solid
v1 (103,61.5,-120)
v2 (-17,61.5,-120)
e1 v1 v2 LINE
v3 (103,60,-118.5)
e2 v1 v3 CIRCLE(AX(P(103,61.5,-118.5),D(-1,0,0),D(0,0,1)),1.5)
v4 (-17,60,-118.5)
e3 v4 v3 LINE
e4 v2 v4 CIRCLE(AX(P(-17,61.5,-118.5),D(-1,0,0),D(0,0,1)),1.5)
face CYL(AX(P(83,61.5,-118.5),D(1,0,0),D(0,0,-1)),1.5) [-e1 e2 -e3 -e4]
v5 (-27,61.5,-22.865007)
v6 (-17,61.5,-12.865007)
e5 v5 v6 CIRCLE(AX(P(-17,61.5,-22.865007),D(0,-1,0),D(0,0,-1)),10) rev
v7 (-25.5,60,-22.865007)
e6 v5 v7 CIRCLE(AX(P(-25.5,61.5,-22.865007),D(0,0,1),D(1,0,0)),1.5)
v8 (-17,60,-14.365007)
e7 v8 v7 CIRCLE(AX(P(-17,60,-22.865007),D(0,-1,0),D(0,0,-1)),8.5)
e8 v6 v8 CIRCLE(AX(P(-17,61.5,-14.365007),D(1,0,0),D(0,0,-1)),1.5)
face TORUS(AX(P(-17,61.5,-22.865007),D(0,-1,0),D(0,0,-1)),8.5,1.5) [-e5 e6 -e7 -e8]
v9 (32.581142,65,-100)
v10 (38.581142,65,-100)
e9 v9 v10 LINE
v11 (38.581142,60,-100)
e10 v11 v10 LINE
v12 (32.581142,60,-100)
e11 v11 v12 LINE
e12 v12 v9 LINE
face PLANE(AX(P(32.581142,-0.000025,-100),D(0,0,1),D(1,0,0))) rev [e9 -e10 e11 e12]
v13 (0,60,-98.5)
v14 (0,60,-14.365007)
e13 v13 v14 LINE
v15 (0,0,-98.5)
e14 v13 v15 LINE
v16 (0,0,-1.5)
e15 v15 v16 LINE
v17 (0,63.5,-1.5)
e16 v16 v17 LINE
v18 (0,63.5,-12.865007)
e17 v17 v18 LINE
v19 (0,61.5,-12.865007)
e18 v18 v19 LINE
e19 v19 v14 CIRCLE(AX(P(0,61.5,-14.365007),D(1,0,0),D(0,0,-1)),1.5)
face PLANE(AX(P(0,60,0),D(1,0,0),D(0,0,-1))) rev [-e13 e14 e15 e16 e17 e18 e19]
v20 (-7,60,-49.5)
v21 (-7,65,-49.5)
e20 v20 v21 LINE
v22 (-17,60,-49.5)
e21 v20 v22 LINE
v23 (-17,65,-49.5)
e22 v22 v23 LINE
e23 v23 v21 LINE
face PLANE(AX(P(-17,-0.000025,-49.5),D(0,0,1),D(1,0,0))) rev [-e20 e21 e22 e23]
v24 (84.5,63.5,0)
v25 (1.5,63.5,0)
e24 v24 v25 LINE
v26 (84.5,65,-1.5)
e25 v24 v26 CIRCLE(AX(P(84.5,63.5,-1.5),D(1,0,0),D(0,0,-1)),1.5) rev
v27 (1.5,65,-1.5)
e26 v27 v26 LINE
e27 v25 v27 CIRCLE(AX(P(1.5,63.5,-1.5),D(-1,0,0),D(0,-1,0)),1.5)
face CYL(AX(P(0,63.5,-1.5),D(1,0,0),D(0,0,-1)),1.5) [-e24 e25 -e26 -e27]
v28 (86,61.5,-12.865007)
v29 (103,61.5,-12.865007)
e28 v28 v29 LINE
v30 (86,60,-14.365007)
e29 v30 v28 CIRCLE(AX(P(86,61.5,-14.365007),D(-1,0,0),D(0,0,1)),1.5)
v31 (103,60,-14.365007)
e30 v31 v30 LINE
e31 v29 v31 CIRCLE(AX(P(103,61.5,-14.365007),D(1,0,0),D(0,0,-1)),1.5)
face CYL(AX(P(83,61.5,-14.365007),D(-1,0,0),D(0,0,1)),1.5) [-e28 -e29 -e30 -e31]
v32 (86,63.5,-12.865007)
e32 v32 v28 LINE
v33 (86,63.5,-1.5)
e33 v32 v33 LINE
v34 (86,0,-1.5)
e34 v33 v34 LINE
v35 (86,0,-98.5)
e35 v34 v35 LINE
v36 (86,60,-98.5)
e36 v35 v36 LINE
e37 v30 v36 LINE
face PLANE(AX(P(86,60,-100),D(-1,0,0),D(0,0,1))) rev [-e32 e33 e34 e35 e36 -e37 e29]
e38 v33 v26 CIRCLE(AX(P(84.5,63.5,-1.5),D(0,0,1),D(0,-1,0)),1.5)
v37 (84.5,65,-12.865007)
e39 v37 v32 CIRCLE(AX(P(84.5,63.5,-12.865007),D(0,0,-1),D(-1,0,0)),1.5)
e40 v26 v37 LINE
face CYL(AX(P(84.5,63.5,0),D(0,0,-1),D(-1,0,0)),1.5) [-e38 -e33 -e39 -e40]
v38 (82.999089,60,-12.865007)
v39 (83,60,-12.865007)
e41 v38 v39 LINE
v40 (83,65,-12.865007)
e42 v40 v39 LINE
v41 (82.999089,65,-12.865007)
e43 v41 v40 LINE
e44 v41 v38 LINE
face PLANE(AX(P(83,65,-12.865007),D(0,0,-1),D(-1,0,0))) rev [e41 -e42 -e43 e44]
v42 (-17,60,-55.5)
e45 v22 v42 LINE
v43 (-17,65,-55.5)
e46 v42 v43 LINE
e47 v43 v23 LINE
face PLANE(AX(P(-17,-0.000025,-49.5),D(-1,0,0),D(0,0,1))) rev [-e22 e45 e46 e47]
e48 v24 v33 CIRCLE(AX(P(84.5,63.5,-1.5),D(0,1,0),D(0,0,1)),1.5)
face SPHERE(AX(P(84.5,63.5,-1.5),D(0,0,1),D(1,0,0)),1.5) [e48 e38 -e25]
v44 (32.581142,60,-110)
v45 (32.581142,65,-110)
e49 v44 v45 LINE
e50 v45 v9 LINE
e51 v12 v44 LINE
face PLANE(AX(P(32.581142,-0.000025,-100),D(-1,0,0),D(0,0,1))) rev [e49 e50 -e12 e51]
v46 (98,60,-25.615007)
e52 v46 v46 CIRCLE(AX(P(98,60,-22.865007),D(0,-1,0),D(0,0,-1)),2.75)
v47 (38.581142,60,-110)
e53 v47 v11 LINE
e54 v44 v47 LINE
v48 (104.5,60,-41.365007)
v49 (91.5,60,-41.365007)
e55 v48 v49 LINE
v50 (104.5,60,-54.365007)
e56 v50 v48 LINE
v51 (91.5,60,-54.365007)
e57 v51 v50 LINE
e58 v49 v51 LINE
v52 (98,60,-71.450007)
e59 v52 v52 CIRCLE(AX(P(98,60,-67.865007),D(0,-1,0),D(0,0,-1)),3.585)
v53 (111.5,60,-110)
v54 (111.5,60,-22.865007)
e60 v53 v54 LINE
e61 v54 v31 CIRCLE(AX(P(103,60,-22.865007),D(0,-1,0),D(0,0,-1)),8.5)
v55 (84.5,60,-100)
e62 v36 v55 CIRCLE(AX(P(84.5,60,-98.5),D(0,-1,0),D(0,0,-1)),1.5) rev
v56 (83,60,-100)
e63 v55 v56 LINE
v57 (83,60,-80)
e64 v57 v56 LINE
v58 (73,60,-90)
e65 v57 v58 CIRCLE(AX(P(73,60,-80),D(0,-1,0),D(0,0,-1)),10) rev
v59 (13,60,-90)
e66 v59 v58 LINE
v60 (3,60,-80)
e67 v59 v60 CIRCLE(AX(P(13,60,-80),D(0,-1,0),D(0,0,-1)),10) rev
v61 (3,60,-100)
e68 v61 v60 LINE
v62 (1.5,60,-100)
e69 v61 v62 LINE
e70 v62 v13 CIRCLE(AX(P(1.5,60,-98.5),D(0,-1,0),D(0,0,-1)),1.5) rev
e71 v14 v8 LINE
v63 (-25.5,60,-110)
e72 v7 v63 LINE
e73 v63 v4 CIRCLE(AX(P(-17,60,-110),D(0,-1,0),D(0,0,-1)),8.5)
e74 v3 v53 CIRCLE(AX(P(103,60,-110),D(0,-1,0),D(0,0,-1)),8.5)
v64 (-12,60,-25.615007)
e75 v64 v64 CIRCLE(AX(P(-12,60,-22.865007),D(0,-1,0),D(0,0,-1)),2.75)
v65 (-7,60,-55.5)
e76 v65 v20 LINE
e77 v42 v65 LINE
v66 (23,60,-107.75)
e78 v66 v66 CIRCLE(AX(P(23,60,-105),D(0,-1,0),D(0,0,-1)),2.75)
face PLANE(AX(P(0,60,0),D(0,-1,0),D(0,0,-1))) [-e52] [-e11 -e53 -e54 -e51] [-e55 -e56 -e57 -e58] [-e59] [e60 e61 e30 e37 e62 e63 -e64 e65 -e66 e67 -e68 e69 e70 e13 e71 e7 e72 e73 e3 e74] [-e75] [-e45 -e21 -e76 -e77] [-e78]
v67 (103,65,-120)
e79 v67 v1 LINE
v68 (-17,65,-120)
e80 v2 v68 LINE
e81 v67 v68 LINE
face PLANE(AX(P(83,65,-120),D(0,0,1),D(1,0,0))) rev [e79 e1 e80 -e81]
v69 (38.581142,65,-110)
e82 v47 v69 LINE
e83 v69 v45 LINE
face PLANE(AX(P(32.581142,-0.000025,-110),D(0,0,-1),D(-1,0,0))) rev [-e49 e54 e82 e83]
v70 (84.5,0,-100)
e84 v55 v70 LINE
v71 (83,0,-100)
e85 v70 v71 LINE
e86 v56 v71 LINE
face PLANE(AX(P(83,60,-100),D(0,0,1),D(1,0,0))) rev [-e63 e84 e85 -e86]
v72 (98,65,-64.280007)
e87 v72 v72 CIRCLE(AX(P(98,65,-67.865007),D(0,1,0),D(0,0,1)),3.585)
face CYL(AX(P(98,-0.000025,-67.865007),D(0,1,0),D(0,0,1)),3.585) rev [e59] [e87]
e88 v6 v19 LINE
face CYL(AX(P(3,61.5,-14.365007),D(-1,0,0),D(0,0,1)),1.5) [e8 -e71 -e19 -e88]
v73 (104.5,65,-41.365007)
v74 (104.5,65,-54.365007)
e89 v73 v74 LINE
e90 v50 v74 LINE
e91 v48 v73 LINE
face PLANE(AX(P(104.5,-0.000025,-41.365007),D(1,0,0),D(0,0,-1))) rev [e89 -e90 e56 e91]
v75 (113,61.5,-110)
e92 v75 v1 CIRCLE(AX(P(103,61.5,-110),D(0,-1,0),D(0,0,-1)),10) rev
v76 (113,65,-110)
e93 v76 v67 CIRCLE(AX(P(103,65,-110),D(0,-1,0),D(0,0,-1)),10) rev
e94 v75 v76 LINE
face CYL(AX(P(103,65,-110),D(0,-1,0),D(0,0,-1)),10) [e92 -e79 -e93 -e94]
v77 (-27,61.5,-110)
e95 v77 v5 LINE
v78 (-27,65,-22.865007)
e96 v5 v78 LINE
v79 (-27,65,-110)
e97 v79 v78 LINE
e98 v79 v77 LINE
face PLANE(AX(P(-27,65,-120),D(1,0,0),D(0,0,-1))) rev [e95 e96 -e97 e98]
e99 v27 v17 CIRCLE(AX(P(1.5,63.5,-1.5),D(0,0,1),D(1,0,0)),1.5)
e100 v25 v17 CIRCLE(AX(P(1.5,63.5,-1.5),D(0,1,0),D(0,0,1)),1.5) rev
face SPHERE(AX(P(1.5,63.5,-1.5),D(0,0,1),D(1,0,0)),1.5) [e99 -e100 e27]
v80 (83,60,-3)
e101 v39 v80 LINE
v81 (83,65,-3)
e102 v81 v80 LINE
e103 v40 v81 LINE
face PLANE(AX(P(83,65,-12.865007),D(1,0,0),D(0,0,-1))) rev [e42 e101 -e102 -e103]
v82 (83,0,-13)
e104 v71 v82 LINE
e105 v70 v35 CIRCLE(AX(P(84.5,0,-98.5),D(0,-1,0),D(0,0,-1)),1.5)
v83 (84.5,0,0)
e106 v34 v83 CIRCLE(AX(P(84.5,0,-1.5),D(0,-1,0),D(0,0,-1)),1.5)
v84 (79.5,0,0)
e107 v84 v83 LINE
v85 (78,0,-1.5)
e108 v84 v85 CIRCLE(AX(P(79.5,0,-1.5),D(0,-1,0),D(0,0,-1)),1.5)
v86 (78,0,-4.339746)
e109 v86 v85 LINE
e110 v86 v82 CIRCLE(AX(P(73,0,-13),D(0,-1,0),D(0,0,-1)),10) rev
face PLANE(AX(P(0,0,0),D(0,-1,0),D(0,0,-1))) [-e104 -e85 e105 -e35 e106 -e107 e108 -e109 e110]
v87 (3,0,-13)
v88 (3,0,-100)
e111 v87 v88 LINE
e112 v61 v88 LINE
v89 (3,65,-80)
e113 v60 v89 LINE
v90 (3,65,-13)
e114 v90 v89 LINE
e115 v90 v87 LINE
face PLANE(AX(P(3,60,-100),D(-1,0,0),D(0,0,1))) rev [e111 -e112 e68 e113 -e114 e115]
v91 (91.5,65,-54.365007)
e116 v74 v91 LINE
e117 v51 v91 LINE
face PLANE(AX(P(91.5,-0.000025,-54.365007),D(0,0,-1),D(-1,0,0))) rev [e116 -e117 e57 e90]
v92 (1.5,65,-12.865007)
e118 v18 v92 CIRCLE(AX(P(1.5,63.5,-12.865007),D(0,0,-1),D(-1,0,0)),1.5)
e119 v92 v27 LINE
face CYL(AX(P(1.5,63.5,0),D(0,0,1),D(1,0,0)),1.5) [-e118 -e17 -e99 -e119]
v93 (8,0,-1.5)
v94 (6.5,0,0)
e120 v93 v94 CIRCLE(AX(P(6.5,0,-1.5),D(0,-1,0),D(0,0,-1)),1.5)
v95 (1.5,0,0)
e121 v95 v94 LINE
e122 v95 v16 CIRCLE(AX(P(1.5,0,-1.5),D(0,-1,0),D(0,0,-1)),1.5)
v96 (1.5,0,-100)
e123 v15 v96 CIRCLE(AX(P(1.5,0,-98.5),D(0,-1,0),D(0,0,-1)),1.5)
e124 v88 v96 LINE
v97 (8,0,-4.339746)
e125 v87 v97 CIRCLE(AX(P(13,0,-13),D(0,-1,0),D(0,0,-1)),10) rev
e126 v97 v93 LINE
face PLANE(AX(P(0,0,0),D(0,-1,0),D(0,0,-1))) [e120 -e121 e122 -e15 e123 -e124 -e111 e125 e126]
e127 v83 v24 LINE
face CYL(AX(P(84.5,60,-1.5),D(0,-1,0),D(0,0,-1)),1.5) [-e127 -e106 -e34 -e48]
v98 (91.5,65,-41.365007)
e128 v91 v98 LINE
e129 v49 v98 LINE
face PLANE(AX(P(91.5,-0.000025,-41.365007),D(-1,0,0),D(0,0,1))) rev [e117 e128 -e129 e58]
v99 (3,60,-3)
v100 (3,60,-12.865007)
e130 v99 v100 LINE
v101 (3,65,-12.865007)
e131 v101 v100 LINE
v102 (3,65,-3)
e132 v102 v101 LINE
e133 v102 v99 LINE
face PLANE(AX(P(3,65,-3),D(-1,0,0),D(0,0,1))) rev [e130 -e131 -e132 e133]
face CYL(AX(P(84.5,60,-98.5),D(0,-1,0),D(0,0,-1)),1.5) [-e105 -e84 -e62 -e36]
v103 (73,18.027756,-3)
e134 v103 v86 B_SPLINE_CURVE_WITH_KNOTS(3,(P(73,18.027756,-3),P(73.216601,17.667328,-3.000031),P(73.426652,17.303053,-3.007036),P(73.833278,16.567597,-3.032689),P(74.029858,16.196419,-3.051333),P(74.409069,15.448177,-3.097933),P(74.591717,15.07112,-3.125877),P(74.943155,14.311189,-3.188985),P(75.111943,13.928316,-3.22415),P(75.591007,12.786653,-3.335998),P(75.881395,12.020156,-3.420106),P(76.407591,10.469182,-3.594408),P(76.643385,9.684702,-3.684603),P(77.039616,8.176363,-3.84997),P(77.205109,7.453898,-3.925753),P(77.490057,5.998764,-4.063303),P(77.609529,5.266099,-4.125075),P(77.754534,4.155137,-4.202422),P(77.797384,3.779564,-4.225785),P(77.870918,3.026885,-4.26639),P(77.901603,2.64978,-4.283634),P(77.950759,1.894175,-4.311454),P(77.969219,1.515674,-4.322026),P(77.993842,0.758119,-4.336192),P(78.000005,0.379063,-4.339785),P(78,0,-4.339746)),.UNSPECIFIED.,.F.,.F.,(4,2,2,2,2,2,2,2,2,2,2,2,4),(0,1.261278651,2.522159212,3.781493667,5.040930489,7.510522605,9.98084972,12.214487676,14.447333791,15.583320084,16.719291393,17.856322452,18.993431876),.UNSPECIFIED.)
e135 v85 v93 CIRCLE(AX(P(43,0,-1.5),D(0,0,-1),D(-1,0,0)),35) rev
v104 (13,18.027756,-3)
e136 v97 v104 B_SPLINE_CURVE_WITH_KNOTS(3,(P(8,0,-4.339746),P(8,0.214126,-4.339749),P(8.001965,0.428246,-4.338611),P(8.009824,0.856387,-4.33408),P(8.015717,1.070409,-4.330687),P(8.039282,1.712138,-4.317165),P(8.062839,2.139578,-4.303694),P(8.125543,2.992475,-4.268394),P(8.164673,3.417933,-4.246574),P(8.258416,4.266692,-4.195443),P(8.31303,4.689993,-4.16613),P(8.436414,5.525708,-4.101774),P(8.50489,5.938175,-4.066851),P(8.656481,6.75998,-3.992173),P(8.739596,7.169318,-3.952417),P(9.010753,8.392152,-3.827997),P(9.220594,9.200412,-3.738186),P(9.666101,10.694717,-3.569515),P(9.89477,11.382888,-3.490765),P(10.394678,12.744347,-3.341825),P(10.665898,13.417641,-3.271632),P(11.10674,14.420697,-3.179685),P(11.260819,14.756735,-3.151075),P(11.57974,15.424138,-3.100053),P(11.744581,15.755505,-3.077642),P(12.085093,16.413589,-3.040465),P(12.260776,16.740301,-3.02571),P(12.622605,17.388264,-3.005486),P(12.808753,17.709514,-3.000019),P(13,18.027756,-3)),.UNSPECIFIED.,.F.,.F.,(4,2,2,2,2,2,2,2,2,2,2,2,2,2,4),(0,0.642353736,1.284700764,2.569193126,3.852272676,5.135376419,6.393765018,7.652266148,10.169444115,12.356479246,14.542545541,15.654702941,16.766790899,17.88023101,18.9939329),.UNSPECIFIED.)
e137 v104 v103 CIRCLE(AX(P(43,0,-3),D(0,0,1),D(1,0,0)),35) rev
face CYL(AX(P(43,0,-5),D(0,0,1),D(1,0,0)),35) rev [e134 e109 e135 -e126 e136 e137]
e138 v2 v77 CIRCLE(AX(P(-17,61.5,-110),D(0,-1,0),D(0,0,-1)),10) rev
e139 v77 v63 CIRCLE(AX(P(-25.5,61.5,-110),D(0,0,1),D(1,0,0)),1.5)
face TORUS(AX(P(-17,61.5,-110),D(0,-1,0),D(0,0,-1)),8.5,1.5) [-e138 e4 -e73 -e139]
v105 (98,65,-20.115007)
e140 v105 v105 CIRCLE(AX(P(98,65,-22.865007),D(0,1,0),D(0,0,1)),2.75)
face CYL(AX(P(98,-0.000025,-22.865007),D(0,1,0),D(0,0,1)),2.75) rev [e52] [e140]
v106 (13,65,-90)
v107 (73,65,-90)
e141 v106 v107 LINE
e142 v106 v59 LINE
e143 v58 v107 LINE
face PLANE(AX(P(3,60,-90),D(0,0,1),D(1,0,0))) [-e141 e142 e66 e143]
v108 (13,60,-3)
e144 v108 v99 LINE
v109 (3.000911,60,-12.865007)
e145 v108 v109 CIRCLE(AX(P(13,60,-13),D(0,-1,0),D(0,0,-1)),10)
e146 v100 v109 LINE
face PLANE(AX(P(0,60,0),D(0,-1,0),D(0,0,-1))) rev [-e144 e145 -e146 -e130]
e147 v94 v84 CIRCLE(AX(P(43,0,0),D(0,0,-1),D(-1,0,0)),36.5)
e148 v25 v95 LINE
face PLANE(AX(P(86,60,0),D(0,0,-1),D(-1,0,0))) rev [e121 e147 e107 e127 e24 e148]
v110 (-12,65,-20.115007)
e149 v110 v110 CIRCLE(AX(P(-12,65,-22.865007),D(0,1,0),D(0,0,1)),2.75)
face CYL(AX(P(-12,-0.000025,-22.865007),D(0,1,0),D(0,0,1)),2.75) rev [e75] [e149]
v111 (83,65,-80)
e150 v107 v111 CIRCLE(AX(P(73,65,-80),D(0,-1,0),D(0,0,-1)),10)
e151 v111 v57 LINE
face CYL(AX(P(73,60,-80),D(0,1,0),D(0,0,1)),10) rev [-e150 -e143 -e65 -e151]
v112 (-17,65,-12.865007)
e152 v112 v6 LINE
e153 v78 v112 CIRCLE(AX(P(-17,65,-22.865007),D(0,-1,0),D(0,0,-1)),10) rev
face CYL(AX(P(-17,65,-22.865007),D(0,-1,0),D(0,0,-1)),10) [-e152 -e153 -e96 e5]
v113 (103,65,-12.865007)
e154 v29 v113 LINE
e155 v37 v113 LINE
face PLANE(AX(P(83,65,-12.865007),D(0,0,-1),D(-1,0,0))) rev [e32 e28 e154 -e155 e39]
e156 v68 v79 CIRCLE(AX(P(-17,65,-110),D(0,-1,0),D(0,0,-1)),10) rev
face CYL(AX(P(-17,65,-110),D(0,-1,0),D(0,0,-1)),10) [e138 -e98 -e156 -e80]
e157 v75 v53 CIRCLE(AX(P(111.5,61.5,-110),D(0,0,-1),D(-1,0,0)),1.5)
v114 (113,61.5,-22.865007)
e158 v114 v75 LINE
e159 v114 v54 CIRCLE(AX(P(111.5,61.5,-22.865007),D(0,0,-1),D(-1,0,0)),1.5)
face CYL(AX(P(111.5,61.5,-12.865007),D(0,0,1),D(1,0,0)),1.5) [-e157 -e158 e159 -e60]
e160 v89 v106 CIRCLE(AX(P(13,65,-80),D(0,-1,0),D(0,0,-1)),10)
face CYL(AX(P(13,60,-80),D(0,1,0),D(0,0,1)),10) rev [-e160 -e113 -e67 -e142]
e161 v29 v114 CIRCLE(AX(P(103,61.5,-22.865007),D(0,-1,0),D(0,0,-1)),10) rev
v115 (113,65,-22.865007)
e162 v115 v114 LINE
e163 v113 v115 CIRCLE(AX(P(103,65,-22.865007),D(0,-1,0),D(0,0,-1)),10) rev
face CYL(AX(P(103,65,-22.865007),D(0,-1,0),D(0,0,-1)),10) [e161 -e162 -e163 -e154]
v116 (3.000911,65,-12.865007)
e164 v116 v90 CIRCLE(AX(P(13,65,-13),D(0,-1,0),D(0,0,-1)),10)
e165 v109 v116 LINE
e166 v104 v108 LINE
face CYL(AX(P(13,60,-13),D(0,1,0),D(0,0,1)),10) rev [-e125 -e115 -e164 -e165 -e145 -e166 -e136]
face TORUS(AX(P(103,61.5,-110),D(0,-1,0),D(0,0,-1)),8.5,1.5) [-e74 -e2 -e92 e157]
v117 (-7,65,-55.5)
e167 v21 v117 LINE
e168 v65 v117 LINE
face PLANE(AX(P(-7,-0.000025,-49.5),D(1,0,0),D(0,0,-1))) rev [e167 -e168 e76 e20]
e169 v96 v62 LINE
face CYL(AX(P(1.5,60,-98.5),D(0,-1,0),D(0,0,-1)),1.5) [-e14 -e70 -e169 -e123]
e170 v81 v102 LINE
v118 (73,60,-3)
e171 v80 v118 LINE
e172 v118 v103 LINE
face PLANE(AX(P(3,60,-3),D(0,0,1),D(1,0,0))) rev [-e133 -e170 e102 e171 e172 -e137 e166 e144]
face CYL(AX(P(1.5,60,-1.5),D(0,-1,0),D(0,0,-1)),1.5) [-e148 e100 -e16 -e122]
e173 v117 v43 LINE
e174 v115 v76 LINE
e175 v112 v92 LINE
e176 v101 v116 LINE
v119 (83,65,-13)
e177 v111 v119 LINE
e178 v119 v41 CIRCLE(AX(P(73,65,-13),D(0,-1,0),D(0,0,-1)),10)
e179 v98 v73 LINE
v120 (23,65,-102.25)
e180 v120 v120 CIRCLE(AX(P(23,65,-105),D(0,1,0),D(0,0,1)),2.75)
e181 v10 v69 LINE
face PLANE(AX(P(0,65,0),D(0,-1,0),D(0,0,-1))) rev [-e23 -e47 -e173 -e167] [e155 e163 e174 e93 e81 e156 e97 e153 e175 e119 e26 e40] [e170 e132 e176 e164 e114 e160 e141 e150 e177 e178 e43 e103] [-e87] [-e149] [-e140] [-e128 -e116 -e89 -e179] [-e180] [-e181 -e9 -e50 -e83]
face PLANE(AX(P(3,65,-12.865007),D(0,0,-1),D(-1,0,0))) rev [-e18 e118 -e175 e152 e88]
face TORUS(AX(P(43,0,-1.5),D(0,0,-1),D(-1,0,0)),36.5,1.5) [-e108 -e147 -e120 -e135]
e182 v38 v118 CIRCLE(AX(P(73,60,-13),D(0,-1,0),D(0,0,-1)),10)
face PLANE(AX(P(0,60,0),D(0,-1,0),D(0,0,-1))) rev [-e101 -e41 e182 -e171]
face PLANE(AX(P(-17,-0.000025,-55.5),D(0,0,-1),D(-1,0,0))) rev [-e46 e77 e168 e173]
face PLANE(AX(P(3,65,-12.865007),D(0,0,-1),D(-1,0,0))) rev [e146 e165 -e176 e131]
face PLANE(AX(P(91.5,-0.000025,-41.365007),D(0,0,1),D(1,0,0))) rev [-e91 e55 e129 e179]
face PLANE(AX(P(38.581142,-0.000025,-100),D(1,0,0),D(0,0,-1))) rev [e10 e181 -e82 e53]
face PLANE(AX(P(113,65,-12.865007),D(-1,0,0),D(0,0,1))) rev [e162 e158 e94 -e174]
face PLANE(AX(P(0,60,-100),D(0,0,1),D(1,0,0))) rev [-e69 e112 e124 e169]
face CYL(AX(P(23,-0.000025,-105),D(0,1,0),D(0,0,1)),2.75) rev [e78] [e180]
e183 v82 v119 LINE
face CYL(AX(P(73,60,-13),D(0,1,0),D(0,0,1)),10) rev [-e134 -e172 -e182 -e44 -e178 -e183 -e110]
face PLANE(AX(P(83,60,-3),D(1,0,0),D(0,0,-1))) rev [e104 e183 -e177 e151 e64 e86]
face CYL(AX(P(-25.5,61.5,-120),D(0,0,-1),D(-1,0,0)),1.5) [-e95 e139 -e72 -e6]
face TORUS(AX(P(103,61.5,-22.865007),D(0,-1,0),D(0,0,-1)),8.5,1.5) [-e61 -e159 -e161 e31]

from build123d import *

# Parameters (mm, degrees)
BOSS_EXTRUDE1_DEPTH = 60
SKETCH2_W           = 30
SKETCH2_H           = 107.13499281
BOSS_EXTRUDE2_DEPTH = 5
SKETCH3_W           = 80
SKETCH3_H           = 30
BOSS_EXTRUDE3_DEPTH = 5
FILLET2_R           = 10
BOSS_EXTRUDE4_DEPTH = 5
CUT_EXTRUDE2_DEPTH  = 5
SKETCH7_R           = 2.75
CUT_EXTRUDE3_DEPTH  = 178.183520713
SKETCH8_W           = 10
SKETCH8_H           = 6
SKETCH8_W_2         = 6
SKETCH8_H_2         = 10
CUT_EXTRUDE4_DEPTH  = 178.183520713
SKETCH10_R          = 3.585
SKETCH10_W          = 13
SKETCH10_H          = 13
CUT_EXTRUDE5_DEPTH  = 178.183520713
FILLET3_R           = 1.5


with BuildPart() as part:
    # Sketch1 → Boss-Extrude1 (new body)
    with BuildSketch(Plane(origin=(0, 0, 0), x_dir=(1, 0, 0), z_dir=(0, 1, 0))):
        Polygon((0, 0), (0, 100), (3, 100), (3, 3), (83, 3), (83, 100), (86, 100), (86, 0), align=None)
    extrude(amount=BOSS_EXTRUDE1_DEPTH)

    # Sketch2 → Boss-Extrude2 (add)
    with BuildSketch(Plane(origin=(0, 60, 0), x_dir=(1, 0, 0), z_dir=(0, 1, 0))):
        with Locations((98, 66.432503591)):
            Rectangle(SKETCH2_W, SKETCH2_H)
        with Locations((-12, 66.432503591)):
            Rectangle(SKETCH2_W, SKETCH2_H)
    extrude(amount=BOSS_EXTRUDE2_DEPTH)

    # Sketch3 → Boss-Extrude3 (add)
    with BuildSketch(Plane(origin=(0, 65, 0), x_dir=(1, 0, 0), z_dir=(0, 1, 0))):
        with Locations((43, 104.999999996)):
            Rectangle(SKETCH3_W, SKETCH3_H)
    extrude(amount=-BOSS_EXTRUDE3_DEPTH)

    # Fillet2
    fillet2_edges = [part.edges().sort_by_distance(p)[0] for p in [
        (83, 30, -3),
        (3, 30, -3),
        (83, 62.5, -89.999999996),
        (3, 62.5, -89.999999996),
    ]]
    fillet(fillet2_edges, radius=FILLET2_R)
    fillet2_2_edges = [part.edges().sort_by_distance(p)[0] for p in [
        (113, 62.5, -119.999999996),
        (-27, 62.5, -119.999999996),
        (113, 62.5, -12.865007186),
        (-27, 62.5, -12.865007186),
    ]]
    fillet(fillet2_2_edges, radius=FILLET2_R)

    # Sketch5 → Boss-Extrude4 (add)
    with BuildSketch(Plane(origin=(0, 60, 0), x_dir=(1, 0, 0), z_dir=(0, 1, 0))):
        Polygon((0, 12.865007186), (0, 0), (86, 0), (86, 12.865007186), (83, 12.865007186), (83, 3), (3, 3), (3, 12.865007186), align=None)
    extrude(amount=BOSS_EXTRUDE4_DEPTH)

    # Sketch6 → Cut-Extrude2 (cut)
    with BuildSketch(Plane.XY):
        with BuildLine():
            Line((8, 0), (78, 0))
            ThreePointArc((78, 0), (43, 35), (8, 0))
        make_face()
    extrude(amount=-CUT_EXTRUDE2_DEPTH, mode=Mode.SUBTRACT)

    # Sketch7 → Cut-Extrude3 (cut, through all)
    with BuildSketch(Plane(origin=(0, 65, 0), x_dir=(1, 0, 0), z_dir=(0, 1, 0))):
        with Locations((-12, 22.865007186)):
            Circle(SKETCH7_R)
        with Locations((23, 104.999999996)):
            Circle(SKETCH7_R)
        with Locations((98, 22.865007186)):
            Circle(SKETCH7_R)
    extrude(amount=-CUT_EXTRUDE3_DEPTH, mode=Mode.SUBTRACT)

    # Sketch8 → Cut-Extrude4 (cut, through all)
    with BuildSketch(Plane(origin=(0, 65, 0), x_dir=(1, 0, 0), z_dir=(0, 1, 0))):
        with Locations((-12, 52.499999996)):
            Rectangle(SKETCH8_W, SKETCH8_H)
        with Locations((35.581142125, 104.999999996)):
            Rectangle(SKETCH8_W_2, SKETCH8_H_2)
    extrude(amount=-CUT_EXTRUDE4_DEPTH, mode=Mode.SUBTRACT)

    # Sketch10 → Cut-Extrude5 (cut, through all)
    with BuildSketch(Plane(origin=(0, 65, 0), x_dir=(1, 0, 0), z_dir=(0, 1, 0))):
        with Locations((98, 67.865007186)):
            Circle(SKETCH10_R)
        with Locations((98, 47.865007186)):
            Rectangle(SKETCH10_W, SKETCH10_H)
    extrude(amount=-CUT_EXTRUDE5_DEPTH, mode=Mode.SUBTRACT)

    # Fillet3
    fillet3_edges = [part.edges().sort_by_distance(p)[0] for p in [
        (-8.5, 60, -12.865007186),
        (-24.071067812, 60, -15.793939374),
        (-27, 60, -66.432503591),
        (-24.071067812, 60, -117.071067808),
        (43, 60, -119.999999996),
        (110.071067812, 60, -117.071067808),
        (113, 60, -66.432503591),
        (94.5, 60, -12.865007186),
        (110.071067812, 60, -15.793939374),
        (0, 32.5, 0),
        (0, 65, -6.432503593),
        (43, 65, 0),
        (86, 32.5, 0),
        (86, 65, -6.432503593),
        (0, 30, -100),
        (86, 30, -100),
        (43, 35, 0),
    ]]
    fillet(fillet3_edges, radius=FILLET3_R)


solid = part.part
